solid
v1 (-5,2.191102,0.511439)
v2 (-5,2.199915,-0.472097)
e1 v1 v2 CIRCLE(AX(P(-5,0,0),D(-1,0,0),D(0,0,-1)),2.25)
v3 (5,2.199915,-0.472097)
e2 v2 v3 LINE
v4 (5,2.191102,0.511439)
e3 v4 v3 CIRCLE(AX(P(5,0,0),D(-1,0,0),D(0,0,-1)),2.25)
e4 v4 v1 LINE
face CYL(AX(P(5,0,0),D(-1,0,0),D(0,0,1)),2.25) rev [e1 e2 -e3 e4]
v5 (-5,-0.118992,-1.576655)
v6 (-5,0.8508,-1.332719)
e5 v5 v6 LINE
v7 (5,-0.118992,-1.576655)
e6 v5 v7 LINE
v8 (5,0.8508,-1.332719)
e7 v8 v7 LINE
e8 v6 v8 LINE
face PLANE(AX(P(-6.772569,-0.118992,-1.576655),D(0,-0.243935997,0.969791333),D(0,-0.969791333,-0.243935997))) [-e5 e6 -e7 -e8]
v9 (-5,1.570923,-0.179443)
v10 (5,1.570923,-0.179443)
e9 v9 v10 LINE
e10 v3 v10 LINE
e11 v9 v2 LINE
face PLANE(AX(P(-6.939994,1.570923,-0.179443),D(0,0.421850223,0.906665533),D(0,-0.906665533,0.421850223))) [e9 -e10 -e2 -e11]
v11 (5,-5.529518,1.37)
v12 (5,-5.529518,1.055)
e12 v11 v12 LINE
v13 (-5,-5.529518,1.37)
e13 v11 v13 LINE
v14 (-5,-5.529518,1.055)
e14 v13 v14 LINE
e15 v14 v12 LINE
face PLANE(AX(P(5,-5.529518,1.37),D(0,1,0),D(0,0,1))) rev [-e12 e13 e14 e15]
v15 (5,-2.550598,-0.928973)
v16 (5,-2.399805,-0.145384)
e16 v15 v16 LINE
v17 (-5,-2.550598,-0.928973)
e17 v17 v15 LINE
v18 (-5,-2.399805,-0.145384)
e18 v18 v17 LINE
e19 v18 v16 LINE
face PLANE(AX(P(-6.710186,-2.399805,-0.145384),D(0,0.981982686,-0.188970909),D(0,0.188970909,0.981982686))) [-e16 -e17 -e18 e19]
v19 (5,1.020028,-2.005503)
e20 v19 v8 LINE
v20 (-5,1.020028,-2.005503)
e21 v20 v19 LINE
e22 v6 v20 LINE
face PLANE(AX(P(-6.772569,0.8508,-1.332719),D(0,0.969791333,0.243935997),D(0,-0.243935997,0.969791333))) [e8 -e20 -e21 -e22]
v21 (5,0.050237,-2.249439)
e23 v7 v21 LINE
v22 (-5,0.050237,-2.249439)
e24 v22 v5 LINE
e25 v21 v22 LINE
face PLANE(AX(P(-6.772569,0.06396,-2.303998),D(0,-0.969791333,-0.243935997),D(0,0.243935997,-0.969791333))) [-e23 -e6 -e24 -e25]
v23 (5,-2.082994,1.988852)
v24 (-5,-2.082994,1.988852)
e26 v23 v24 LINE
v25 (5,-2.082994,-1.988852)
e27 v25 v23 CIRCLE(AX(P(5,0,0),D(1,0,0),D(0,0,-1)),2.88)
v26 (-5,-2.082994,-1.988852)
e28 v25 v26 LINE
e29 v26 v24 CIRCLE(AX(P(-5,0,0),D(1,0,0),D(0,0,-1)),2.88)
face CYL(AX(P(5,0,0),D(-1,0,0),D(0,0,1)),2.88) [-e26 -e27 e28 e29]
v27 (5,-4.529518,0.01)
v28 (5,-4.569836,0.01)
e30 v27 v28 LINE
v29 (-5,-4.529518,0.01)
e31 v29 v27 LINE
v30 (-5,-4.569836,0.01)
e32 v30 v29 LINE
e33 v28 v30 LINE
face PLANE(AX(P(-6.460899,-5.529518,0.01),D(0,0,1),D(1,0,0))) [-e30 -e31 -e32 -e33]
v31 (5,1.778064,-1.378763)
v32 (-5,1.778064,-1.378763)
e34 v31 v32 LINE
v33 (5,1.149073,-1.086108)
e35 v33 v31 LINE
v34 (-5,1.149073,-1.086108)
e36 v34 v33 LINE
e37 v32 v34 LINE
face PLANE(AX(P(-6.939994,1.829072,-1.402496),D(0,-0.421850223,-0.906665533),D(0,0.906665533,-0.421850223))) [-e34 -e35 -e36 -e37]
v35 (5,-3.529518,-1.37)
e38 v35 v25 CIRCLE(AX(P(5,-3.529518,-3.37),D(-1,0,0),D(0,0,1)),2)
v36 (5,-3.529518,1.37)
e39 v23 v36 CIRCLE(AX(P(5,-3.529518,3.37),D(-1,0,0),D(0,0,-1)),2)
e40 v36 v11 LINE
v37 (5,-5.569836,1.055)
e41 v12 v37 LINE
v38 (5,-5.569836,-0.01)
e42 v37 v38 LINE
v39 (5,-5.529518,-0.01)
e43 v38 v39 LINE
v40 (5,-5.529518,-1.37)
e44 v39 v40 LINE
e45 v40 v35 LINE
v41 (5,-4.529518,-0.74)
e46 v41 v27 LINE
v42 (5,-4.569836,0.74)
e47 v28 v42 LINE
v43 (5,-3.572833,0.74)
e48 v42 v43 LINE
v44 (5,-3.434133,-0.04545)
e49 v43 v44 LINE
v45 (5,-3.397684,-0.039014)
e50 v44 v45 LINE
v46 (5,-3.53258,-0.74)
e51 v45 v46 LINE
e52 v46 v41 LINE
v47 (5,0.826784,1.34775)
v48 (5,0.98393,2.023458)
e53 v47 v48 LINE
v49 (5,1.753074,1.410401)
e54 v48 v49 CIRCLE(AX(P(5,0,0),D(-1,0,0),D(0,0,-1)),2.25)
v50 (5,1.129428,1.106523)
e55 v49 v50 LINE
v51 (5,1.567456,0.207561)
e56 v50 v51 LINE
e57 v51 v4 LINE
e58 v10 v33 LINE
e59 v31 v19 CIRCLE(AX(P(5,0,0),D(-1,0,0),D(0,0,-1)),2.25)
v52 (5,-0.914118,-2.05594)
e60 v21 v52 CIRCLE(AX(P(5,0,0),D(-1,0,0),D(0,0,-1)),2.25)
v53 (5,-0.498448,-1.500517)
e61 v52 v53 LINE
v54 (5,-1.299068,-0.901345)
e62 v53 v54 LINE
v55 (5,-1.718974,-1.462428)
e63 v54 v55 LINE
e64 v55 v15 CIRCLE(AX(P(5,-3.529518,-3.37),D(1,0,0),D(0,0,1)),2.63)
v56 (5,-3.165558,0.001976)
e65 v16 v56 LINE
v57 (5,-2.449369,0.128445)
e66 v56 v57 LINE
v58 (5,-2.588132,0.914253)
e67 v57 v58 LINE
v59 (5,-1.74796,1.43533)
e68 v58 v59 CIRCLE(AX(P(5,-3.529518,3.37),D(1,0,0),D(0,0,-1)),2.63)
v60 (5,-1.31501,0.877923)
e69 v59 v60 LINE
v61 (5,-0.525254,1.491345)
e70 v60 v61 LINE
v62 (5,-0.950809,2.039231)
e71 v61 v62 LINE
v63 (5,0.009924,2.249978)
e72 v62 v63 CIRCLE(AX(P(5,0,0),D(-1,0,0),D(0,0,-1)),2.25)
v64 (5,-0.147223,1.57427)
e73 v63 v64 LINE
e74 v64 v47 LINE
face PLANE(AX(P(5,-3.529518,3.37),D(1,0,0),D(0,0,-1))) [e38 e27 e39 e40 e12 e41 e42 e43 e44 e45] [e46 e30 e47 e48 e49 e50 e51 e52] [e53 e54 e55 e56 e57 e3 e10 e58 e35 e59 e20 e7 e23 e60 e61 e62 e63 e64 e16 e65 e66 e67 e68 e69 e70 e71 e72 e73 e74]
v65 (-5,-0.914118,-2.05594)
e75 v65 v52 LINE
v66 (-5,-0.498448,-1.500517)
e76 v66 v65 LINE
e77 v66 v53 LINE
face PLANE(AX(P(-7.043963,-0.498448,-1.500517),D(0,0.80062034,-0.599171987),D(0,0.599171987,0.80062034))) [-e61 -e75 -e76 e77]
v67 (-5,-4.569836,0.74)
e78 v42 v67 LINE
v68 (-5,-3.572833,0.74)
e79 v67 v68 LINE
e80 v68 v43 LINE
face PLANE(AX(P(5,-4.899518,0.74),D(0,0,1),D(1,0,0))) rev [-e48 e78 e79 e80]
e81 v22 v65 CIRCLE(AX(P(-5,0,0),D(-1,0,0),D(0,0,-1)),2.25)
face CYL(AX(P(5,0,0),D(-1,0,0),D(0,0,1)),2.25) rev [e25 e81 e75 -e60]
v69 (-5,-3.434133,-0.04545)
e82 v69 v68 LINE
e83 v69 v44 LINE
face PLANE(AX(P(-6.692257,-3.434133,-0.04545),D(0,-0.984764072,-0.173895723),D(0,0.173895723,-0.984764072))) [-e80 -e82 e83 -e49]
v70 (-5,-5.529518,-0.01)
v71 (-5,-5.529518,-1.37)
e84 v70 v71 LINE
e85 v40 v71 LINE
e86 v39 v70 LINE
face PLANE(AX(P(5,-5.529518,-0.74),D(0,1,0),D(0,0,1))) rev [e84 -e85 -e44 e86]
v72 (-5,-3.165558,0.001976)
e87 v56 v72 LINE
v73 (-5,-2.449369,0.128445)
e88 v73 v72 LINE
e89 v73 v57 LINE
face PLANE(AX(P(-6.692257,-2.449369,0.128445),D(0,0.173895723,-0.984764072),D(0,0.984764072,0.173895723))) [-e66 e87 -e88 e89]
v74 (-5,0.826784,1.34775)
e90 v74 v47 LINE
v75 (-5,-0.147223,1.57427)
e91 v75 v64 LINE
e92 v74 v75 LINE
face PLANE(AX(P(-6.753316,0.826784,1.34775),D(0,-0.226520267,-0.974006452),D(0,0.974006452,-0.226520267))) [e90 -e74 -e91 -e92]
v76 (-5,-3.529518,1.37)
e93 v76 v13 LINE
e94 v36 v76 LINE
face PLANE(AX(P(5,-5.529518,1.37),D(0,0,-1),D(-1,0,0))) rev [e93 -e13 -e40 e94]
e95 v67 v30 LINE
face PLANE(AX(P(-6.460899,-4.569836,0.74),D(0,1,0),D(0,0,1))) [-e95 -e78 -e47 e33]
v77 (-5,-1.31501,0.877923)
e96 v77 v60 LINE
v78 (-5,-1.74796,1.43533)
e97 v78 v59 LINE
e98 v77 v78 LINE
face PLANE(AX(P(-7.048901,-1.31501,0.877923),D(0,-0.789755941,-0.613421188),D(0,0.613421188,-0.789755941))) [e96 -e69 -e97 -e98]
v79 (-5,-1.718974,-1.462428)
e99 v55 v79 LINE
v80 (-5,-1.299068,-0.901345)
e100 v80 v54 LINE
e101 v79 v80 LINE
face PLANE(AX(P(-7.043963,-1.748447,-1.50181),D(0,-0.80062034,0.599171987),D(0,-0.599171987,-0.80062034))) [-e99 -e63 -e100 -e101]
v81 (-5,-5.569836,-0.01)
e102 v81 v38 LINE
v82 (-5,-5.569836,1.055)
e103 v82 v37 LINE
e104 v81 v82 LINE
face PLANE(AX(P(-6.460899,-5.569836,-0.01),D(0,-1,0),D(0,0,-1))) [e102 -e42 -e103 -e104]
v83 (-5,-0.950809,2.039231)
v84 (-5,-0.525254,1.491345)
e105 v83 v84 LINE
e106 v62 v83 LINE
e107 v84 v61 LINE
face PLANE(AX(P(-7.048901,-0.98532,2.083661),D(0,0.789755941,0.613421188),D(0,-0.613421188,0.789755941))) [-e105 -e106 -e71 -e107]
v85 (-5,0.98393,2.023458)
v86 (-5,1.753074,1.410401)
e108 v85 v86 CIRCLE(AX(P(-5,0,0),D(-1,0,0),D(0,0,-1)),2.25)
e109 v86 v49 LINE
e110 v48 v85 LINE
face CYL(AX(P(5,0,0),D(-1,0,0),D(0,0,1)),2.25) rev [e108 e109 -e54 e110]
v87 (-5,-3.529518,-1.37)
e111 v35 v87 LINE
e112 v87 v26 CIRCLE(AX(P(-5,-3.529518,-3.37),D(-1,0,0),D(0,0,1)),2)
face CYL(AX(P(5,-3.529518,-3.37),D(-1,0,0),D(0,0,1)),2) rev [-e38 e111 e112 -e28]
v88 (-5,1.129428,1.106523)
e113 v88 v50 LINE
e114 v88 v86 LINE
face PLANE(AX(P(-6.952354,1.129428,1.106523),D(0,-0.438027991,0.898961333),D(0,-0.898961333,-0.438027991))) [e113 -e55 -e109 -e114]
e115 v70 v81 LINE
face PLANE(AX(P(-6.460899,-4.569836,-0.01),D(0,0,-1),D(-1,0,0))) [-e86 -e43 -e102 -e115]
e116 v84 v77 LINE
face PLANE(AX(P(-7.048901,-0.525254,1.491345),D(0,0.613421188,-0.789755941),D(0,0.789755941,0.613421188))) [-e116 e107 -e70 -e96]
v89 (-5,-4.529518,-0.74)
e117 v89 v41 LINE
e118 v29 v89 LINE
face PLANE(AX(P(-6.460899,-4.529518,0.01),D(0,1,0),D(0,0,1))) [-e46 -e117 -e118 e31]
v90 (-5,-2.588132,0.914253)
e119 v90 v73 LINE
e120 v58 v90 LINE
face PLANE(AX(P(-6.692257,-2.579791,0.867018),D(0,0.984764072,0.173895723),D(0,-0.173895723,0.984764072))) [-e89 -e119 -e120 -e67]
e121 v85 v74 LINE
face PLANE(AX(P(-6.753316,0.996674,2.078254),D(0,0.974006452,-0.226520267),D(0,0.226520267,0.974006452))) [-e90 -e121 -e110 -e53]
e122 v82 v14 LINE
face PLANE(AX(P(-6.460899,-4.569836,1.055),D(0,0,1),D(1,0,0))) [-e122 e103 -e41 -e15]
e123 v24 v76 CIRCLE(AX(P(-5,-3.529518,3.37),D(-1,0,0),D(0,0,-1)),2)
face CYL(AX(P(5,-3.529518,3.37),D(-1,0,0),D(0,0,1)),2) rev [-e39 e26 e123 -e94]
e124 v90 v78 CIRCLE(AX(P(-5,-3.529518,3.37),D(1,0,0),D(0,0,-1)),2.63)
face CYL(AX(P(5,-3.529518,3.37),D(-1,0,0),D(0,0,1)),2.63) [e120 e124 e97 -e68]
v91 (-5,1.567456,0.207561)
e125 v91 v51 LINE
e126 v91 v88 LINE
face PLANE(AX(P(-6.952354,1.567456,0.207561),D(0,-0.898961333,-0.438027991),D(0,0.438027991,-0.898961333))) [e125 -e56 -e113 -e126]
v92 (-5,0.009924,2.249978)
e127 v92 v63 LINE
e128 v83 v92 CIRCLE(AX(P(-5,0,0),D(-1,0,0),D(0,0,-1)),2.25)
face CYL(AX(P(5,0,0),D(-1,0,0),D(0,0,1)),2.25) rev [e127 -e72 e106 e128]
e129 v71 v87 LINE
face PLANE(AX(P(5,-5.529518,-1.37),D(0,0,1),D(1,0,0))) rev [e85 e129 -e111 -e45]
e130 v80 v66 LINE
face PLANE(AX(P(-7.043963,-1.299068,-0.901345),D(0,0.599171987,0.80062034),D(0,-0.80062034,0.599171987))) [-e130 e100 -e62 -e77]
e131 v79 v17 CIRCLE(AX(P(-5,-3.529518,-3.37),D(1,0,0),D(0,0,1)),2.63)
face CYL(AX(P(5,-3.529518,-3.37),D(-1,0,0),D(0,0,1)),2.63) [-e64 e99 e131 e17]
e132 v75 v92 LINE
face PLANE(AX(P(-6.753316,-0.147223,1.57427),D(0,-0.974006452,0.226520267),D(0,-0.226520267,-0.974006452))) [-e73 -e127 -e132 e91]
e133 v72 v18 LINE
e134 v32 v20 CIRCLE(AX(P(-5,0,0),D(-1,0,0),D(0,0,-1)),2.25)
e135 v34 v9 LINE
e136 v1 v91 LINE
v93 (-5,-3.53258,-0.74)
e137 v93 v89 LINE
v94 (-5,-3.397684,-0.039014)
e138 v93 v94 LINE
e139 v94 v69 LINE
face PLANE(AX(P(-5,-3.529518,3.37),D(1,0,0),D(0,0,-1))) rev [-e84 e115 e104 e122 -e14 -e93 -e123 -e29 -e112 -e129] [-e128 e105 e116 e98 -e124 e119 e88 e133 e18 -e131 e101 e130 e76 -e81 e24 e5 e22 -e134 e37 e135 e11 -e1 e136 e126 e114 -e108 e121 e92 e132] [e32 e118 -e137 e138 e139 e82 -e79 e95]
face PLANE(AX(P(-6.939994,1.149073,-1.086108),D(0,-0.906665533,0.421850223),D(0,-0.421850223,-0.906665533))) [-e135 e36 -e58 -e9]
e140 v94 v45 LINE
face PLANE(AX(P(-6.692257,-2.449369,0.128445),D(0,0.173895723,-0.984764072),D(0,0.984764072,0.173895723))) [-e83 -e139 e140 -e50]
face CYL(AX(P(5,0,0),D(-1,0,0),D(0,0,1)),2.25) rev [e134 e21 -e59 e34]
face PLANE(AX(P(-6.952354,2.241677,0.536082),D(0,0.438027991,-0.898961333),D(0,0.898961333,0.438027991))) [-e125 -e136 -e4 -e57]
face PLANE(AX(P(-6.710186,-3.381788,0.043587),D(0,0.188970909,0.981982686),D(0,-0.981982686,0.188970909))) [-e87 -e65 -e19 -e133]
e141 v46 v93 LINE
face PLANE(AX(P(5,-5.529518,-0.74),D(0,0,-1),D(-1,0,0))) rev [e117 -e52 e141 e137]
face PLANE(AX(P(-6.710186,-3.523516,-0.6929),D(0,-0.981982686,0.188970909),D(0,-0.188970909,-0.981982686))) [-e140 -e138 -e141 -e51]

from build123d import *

# Parameters (mm, degrees)
BOSS_EXTRUDE1_DEPTH = 5
BOSS_EXTRUDE2_DEPTH = 10
CRVPATTERN1_START   = -5
CRVPATTERN1_DEPTH   = 10


# Read off the part's stored shape, not the designer's step: CrvPattern1
with BuildPart() as part:
    # Sketch1 → Boss-Extrude1 (new, symmetric)
    with BuildSketch(Plane(origin=(0, 0, 0), x_dir=(0, 0, -1), z_dir=(1, 0, 0))):
        with BuildLine():
            Line((-0.74, -4.899518381), (-0.74, -3.529518381))
            ThreePointArc((-0.74, -3.529518381), (-0.951991552, -2.495045015), (-1.553790984, -1.627339417))
            ThreePointArc((-1.553790984, -1.627339417), (0, 2.25), (1.553790984, -1.627339417))
            ThreePointArc((1.553790984, -1.627339417), (0.951991552, -2.495045015), (0.74, -3.529518381))
            Line((0.74, -3.529518381), (0.74, -4.899518381))
            Line((0.74, -4.899518381), (0.74, -5.529518381))
            Line((0.74, -5.529518381), (1.37, -5.529518381))
            Line((1.37, -5.529518381), (1.37, -3.529518381))
            ThreePointArc((1.37, -3.529518381), (1.531210305, -2.74284662), (1.988852459, -2.082994454))
            ThreePointArc((1.988852459, -2.082994454), (0, 2.88), (-1.988852459, -2.082994454))
            ThreePointArc((-1.988852459, -2.082994454), (-1.531210305, -2.74284662), (-1.37, -3.529518381))
            Line((-1.37, -3.529518381), (-1.37, -5.529518381))
            Line((-1.37, -5.529518381), (-0.74, -5.529518381))
            Line((-0.74, -5.529518381), (-0.74, -4.899518381))
        make_face()
    extrude(amount=BOSS_EXTRUDE1_DEPTH, both=True)

    # Sketch2 → Boss-Extrude2 (add)
    with BuildSketch(Plane(origin=(5, 0, 0), x_dir=(0, 0, -1), z_dir=(1, 0, 0))):
        Polygon((0.74, -5.529518381), (-0.01, -5.529518381), (-0.01, -4.529518381), (1.055, -4.529518381), (1.055, -5.529518381), align=None)
    extrude(amount=-BOSS_EXTRUDE2_DEPTH)

    # CrvPattern1 outline → CrvPattern1 (add)
    with BuildSketch(Plane.YZ.offset(CRVPATTERN1_START)):
        with BuildLine():
            Line((-3.434132874, -0.045450425), (-3.397683617, -0.03901399))
            Line((-3.397683617, -0.03901399), (-3.532580052, -0.74))
            Line((-3.532580052, -0.74), (-3.529518381, -0.74))
            ThreePointArc((-3.529518381, -0.74), (-3.03102155, -0.78767529), (-2.550597709, -0.928972692))
            Line((-2.550597709, -0.928972692), (-2.399805364, -0.145383976))
            Line((-2.399805364, -0.145383976), (-3.165558429, 0.00197611))
            Line((-3.165558429, 0.00197611), (-2.449368801, 0.128445298))
            Line((-2.449368801, 0.128445298), (-2.588131662, 0.914253465))
            ThreePointArc((-2.588131662, 0.914253465), (-3.050829227, 0.783930261), (-3.529518381, 0.74))
            Line((-3.529518381, 0.74), (-3.572832561, 0.74))
            Line((-3.572832561, 0.74), (-3.434132874, -0.045450425))
        make_face()
        Polygon((-4.569835686, 0.01), (-4.569835686, 0.74), (-5.529518381, 0.74), (-5.529518381, 1.055), (-5.569835686, 1.055), (-5.569835686, -0.01), (-5.529518381, -0.01), (-5.529518381, 0.01), align=None)
        with BuildLine():
            Line((-1.299068151, -0.901344517), (-1.718974467, -1.462428052))
            ThreePointArc((-1.718974467, -1.462428052), (-1.672594961, -1.507545863), (-1.627339417, -1.553790984))
            ThreePointArc((-1.627339417, -1.553790984), (-1.295295274, -1.839758178), (-0.914118043, -2.055939737))
            Line((-0.914118043, -2.055939737), (-0.498447811, -1.500516504))
            Line((-0.498447811, -1.500516504), (-1.299068151, -0.901344517))
        make_face()
        with BuildLine():
            ThreePointArc((-1.627339417, 1.553790984), (-1.686697501, 1.493590875), (-1.747959826, 1.435329714))
            Line((-1.747959826, 1.435329714), (-1.315009752, 0.877923318))
            Line((-1.315009752, 0.877923318), (-0.525253811, 1.491344505))
            Line((-0.525253811, 1.491344505), (-0.950809299, 2.039230658))
            ThreePointArc((-0.950809299, 2.039230658), (-1.311726198, 1.828079424), (-1.627339417, 1.553790984))
        make_face()
        with BuildLine():
            Line((-0.118991671, -1.576654998), (0.050236755, -2.249439101))
            ThreePointArc((0.050236755, -2.249439101), (0.548855993, -2.182030499), (1.020028088, -2.005503104))
            Line((1.020028088, -2.005503104), (0.850799662, -1.332719001))
            Line((0.850799662, -1.332719001), (-0.118991671, -1.576654998))
        make_face()
        with BuildLine():
            ThreePointArc((0.983930045, 2.023457849), (0.509670601, 2.191514517), (0.009923593, 2.249978116))
            Line((0.009923593, 2.249978116), (-0.147222825, 1.574269812))
            Line((-0.147222825, 1.574269812), (0.826783627, 1.347749545))
            Line((0.826783627, 1.347749545), (0.983930045, 2.023457849))
        make_face()
        with BuildLine():
            Line((1.149073188, -1.086108101), (1.77806433, -1.378762938))
            ThreePointArc((1.77806433, -1.378762938), (2.03999745, -0.949163002), (2.199914553, -0.472097404))
            Line((2.199914553, -0.472097404), (1.570923411, -0.179442568))
            Line((1.570923411, -0.179442568), (1.149073188, -1.086108101))
        make_face()
        with BuildLine():
            ThreePointArc((2.191102417, 0.511439339), (2.022663, 0.98556298), (1.753074426, 1.410400673))
            Line((1.753074426, 1.410400673), (1.129428004, 1.106522654))
            Line((1.129428004, 1.106522654), (1.567455996, 0.20756132))
            Line((1.567455996, 0.20756132), (2.191102417, 0.511439339))
        make_face()
    extrude(amount=CRVPATTERN1_DEPTH)


solid = part.part
